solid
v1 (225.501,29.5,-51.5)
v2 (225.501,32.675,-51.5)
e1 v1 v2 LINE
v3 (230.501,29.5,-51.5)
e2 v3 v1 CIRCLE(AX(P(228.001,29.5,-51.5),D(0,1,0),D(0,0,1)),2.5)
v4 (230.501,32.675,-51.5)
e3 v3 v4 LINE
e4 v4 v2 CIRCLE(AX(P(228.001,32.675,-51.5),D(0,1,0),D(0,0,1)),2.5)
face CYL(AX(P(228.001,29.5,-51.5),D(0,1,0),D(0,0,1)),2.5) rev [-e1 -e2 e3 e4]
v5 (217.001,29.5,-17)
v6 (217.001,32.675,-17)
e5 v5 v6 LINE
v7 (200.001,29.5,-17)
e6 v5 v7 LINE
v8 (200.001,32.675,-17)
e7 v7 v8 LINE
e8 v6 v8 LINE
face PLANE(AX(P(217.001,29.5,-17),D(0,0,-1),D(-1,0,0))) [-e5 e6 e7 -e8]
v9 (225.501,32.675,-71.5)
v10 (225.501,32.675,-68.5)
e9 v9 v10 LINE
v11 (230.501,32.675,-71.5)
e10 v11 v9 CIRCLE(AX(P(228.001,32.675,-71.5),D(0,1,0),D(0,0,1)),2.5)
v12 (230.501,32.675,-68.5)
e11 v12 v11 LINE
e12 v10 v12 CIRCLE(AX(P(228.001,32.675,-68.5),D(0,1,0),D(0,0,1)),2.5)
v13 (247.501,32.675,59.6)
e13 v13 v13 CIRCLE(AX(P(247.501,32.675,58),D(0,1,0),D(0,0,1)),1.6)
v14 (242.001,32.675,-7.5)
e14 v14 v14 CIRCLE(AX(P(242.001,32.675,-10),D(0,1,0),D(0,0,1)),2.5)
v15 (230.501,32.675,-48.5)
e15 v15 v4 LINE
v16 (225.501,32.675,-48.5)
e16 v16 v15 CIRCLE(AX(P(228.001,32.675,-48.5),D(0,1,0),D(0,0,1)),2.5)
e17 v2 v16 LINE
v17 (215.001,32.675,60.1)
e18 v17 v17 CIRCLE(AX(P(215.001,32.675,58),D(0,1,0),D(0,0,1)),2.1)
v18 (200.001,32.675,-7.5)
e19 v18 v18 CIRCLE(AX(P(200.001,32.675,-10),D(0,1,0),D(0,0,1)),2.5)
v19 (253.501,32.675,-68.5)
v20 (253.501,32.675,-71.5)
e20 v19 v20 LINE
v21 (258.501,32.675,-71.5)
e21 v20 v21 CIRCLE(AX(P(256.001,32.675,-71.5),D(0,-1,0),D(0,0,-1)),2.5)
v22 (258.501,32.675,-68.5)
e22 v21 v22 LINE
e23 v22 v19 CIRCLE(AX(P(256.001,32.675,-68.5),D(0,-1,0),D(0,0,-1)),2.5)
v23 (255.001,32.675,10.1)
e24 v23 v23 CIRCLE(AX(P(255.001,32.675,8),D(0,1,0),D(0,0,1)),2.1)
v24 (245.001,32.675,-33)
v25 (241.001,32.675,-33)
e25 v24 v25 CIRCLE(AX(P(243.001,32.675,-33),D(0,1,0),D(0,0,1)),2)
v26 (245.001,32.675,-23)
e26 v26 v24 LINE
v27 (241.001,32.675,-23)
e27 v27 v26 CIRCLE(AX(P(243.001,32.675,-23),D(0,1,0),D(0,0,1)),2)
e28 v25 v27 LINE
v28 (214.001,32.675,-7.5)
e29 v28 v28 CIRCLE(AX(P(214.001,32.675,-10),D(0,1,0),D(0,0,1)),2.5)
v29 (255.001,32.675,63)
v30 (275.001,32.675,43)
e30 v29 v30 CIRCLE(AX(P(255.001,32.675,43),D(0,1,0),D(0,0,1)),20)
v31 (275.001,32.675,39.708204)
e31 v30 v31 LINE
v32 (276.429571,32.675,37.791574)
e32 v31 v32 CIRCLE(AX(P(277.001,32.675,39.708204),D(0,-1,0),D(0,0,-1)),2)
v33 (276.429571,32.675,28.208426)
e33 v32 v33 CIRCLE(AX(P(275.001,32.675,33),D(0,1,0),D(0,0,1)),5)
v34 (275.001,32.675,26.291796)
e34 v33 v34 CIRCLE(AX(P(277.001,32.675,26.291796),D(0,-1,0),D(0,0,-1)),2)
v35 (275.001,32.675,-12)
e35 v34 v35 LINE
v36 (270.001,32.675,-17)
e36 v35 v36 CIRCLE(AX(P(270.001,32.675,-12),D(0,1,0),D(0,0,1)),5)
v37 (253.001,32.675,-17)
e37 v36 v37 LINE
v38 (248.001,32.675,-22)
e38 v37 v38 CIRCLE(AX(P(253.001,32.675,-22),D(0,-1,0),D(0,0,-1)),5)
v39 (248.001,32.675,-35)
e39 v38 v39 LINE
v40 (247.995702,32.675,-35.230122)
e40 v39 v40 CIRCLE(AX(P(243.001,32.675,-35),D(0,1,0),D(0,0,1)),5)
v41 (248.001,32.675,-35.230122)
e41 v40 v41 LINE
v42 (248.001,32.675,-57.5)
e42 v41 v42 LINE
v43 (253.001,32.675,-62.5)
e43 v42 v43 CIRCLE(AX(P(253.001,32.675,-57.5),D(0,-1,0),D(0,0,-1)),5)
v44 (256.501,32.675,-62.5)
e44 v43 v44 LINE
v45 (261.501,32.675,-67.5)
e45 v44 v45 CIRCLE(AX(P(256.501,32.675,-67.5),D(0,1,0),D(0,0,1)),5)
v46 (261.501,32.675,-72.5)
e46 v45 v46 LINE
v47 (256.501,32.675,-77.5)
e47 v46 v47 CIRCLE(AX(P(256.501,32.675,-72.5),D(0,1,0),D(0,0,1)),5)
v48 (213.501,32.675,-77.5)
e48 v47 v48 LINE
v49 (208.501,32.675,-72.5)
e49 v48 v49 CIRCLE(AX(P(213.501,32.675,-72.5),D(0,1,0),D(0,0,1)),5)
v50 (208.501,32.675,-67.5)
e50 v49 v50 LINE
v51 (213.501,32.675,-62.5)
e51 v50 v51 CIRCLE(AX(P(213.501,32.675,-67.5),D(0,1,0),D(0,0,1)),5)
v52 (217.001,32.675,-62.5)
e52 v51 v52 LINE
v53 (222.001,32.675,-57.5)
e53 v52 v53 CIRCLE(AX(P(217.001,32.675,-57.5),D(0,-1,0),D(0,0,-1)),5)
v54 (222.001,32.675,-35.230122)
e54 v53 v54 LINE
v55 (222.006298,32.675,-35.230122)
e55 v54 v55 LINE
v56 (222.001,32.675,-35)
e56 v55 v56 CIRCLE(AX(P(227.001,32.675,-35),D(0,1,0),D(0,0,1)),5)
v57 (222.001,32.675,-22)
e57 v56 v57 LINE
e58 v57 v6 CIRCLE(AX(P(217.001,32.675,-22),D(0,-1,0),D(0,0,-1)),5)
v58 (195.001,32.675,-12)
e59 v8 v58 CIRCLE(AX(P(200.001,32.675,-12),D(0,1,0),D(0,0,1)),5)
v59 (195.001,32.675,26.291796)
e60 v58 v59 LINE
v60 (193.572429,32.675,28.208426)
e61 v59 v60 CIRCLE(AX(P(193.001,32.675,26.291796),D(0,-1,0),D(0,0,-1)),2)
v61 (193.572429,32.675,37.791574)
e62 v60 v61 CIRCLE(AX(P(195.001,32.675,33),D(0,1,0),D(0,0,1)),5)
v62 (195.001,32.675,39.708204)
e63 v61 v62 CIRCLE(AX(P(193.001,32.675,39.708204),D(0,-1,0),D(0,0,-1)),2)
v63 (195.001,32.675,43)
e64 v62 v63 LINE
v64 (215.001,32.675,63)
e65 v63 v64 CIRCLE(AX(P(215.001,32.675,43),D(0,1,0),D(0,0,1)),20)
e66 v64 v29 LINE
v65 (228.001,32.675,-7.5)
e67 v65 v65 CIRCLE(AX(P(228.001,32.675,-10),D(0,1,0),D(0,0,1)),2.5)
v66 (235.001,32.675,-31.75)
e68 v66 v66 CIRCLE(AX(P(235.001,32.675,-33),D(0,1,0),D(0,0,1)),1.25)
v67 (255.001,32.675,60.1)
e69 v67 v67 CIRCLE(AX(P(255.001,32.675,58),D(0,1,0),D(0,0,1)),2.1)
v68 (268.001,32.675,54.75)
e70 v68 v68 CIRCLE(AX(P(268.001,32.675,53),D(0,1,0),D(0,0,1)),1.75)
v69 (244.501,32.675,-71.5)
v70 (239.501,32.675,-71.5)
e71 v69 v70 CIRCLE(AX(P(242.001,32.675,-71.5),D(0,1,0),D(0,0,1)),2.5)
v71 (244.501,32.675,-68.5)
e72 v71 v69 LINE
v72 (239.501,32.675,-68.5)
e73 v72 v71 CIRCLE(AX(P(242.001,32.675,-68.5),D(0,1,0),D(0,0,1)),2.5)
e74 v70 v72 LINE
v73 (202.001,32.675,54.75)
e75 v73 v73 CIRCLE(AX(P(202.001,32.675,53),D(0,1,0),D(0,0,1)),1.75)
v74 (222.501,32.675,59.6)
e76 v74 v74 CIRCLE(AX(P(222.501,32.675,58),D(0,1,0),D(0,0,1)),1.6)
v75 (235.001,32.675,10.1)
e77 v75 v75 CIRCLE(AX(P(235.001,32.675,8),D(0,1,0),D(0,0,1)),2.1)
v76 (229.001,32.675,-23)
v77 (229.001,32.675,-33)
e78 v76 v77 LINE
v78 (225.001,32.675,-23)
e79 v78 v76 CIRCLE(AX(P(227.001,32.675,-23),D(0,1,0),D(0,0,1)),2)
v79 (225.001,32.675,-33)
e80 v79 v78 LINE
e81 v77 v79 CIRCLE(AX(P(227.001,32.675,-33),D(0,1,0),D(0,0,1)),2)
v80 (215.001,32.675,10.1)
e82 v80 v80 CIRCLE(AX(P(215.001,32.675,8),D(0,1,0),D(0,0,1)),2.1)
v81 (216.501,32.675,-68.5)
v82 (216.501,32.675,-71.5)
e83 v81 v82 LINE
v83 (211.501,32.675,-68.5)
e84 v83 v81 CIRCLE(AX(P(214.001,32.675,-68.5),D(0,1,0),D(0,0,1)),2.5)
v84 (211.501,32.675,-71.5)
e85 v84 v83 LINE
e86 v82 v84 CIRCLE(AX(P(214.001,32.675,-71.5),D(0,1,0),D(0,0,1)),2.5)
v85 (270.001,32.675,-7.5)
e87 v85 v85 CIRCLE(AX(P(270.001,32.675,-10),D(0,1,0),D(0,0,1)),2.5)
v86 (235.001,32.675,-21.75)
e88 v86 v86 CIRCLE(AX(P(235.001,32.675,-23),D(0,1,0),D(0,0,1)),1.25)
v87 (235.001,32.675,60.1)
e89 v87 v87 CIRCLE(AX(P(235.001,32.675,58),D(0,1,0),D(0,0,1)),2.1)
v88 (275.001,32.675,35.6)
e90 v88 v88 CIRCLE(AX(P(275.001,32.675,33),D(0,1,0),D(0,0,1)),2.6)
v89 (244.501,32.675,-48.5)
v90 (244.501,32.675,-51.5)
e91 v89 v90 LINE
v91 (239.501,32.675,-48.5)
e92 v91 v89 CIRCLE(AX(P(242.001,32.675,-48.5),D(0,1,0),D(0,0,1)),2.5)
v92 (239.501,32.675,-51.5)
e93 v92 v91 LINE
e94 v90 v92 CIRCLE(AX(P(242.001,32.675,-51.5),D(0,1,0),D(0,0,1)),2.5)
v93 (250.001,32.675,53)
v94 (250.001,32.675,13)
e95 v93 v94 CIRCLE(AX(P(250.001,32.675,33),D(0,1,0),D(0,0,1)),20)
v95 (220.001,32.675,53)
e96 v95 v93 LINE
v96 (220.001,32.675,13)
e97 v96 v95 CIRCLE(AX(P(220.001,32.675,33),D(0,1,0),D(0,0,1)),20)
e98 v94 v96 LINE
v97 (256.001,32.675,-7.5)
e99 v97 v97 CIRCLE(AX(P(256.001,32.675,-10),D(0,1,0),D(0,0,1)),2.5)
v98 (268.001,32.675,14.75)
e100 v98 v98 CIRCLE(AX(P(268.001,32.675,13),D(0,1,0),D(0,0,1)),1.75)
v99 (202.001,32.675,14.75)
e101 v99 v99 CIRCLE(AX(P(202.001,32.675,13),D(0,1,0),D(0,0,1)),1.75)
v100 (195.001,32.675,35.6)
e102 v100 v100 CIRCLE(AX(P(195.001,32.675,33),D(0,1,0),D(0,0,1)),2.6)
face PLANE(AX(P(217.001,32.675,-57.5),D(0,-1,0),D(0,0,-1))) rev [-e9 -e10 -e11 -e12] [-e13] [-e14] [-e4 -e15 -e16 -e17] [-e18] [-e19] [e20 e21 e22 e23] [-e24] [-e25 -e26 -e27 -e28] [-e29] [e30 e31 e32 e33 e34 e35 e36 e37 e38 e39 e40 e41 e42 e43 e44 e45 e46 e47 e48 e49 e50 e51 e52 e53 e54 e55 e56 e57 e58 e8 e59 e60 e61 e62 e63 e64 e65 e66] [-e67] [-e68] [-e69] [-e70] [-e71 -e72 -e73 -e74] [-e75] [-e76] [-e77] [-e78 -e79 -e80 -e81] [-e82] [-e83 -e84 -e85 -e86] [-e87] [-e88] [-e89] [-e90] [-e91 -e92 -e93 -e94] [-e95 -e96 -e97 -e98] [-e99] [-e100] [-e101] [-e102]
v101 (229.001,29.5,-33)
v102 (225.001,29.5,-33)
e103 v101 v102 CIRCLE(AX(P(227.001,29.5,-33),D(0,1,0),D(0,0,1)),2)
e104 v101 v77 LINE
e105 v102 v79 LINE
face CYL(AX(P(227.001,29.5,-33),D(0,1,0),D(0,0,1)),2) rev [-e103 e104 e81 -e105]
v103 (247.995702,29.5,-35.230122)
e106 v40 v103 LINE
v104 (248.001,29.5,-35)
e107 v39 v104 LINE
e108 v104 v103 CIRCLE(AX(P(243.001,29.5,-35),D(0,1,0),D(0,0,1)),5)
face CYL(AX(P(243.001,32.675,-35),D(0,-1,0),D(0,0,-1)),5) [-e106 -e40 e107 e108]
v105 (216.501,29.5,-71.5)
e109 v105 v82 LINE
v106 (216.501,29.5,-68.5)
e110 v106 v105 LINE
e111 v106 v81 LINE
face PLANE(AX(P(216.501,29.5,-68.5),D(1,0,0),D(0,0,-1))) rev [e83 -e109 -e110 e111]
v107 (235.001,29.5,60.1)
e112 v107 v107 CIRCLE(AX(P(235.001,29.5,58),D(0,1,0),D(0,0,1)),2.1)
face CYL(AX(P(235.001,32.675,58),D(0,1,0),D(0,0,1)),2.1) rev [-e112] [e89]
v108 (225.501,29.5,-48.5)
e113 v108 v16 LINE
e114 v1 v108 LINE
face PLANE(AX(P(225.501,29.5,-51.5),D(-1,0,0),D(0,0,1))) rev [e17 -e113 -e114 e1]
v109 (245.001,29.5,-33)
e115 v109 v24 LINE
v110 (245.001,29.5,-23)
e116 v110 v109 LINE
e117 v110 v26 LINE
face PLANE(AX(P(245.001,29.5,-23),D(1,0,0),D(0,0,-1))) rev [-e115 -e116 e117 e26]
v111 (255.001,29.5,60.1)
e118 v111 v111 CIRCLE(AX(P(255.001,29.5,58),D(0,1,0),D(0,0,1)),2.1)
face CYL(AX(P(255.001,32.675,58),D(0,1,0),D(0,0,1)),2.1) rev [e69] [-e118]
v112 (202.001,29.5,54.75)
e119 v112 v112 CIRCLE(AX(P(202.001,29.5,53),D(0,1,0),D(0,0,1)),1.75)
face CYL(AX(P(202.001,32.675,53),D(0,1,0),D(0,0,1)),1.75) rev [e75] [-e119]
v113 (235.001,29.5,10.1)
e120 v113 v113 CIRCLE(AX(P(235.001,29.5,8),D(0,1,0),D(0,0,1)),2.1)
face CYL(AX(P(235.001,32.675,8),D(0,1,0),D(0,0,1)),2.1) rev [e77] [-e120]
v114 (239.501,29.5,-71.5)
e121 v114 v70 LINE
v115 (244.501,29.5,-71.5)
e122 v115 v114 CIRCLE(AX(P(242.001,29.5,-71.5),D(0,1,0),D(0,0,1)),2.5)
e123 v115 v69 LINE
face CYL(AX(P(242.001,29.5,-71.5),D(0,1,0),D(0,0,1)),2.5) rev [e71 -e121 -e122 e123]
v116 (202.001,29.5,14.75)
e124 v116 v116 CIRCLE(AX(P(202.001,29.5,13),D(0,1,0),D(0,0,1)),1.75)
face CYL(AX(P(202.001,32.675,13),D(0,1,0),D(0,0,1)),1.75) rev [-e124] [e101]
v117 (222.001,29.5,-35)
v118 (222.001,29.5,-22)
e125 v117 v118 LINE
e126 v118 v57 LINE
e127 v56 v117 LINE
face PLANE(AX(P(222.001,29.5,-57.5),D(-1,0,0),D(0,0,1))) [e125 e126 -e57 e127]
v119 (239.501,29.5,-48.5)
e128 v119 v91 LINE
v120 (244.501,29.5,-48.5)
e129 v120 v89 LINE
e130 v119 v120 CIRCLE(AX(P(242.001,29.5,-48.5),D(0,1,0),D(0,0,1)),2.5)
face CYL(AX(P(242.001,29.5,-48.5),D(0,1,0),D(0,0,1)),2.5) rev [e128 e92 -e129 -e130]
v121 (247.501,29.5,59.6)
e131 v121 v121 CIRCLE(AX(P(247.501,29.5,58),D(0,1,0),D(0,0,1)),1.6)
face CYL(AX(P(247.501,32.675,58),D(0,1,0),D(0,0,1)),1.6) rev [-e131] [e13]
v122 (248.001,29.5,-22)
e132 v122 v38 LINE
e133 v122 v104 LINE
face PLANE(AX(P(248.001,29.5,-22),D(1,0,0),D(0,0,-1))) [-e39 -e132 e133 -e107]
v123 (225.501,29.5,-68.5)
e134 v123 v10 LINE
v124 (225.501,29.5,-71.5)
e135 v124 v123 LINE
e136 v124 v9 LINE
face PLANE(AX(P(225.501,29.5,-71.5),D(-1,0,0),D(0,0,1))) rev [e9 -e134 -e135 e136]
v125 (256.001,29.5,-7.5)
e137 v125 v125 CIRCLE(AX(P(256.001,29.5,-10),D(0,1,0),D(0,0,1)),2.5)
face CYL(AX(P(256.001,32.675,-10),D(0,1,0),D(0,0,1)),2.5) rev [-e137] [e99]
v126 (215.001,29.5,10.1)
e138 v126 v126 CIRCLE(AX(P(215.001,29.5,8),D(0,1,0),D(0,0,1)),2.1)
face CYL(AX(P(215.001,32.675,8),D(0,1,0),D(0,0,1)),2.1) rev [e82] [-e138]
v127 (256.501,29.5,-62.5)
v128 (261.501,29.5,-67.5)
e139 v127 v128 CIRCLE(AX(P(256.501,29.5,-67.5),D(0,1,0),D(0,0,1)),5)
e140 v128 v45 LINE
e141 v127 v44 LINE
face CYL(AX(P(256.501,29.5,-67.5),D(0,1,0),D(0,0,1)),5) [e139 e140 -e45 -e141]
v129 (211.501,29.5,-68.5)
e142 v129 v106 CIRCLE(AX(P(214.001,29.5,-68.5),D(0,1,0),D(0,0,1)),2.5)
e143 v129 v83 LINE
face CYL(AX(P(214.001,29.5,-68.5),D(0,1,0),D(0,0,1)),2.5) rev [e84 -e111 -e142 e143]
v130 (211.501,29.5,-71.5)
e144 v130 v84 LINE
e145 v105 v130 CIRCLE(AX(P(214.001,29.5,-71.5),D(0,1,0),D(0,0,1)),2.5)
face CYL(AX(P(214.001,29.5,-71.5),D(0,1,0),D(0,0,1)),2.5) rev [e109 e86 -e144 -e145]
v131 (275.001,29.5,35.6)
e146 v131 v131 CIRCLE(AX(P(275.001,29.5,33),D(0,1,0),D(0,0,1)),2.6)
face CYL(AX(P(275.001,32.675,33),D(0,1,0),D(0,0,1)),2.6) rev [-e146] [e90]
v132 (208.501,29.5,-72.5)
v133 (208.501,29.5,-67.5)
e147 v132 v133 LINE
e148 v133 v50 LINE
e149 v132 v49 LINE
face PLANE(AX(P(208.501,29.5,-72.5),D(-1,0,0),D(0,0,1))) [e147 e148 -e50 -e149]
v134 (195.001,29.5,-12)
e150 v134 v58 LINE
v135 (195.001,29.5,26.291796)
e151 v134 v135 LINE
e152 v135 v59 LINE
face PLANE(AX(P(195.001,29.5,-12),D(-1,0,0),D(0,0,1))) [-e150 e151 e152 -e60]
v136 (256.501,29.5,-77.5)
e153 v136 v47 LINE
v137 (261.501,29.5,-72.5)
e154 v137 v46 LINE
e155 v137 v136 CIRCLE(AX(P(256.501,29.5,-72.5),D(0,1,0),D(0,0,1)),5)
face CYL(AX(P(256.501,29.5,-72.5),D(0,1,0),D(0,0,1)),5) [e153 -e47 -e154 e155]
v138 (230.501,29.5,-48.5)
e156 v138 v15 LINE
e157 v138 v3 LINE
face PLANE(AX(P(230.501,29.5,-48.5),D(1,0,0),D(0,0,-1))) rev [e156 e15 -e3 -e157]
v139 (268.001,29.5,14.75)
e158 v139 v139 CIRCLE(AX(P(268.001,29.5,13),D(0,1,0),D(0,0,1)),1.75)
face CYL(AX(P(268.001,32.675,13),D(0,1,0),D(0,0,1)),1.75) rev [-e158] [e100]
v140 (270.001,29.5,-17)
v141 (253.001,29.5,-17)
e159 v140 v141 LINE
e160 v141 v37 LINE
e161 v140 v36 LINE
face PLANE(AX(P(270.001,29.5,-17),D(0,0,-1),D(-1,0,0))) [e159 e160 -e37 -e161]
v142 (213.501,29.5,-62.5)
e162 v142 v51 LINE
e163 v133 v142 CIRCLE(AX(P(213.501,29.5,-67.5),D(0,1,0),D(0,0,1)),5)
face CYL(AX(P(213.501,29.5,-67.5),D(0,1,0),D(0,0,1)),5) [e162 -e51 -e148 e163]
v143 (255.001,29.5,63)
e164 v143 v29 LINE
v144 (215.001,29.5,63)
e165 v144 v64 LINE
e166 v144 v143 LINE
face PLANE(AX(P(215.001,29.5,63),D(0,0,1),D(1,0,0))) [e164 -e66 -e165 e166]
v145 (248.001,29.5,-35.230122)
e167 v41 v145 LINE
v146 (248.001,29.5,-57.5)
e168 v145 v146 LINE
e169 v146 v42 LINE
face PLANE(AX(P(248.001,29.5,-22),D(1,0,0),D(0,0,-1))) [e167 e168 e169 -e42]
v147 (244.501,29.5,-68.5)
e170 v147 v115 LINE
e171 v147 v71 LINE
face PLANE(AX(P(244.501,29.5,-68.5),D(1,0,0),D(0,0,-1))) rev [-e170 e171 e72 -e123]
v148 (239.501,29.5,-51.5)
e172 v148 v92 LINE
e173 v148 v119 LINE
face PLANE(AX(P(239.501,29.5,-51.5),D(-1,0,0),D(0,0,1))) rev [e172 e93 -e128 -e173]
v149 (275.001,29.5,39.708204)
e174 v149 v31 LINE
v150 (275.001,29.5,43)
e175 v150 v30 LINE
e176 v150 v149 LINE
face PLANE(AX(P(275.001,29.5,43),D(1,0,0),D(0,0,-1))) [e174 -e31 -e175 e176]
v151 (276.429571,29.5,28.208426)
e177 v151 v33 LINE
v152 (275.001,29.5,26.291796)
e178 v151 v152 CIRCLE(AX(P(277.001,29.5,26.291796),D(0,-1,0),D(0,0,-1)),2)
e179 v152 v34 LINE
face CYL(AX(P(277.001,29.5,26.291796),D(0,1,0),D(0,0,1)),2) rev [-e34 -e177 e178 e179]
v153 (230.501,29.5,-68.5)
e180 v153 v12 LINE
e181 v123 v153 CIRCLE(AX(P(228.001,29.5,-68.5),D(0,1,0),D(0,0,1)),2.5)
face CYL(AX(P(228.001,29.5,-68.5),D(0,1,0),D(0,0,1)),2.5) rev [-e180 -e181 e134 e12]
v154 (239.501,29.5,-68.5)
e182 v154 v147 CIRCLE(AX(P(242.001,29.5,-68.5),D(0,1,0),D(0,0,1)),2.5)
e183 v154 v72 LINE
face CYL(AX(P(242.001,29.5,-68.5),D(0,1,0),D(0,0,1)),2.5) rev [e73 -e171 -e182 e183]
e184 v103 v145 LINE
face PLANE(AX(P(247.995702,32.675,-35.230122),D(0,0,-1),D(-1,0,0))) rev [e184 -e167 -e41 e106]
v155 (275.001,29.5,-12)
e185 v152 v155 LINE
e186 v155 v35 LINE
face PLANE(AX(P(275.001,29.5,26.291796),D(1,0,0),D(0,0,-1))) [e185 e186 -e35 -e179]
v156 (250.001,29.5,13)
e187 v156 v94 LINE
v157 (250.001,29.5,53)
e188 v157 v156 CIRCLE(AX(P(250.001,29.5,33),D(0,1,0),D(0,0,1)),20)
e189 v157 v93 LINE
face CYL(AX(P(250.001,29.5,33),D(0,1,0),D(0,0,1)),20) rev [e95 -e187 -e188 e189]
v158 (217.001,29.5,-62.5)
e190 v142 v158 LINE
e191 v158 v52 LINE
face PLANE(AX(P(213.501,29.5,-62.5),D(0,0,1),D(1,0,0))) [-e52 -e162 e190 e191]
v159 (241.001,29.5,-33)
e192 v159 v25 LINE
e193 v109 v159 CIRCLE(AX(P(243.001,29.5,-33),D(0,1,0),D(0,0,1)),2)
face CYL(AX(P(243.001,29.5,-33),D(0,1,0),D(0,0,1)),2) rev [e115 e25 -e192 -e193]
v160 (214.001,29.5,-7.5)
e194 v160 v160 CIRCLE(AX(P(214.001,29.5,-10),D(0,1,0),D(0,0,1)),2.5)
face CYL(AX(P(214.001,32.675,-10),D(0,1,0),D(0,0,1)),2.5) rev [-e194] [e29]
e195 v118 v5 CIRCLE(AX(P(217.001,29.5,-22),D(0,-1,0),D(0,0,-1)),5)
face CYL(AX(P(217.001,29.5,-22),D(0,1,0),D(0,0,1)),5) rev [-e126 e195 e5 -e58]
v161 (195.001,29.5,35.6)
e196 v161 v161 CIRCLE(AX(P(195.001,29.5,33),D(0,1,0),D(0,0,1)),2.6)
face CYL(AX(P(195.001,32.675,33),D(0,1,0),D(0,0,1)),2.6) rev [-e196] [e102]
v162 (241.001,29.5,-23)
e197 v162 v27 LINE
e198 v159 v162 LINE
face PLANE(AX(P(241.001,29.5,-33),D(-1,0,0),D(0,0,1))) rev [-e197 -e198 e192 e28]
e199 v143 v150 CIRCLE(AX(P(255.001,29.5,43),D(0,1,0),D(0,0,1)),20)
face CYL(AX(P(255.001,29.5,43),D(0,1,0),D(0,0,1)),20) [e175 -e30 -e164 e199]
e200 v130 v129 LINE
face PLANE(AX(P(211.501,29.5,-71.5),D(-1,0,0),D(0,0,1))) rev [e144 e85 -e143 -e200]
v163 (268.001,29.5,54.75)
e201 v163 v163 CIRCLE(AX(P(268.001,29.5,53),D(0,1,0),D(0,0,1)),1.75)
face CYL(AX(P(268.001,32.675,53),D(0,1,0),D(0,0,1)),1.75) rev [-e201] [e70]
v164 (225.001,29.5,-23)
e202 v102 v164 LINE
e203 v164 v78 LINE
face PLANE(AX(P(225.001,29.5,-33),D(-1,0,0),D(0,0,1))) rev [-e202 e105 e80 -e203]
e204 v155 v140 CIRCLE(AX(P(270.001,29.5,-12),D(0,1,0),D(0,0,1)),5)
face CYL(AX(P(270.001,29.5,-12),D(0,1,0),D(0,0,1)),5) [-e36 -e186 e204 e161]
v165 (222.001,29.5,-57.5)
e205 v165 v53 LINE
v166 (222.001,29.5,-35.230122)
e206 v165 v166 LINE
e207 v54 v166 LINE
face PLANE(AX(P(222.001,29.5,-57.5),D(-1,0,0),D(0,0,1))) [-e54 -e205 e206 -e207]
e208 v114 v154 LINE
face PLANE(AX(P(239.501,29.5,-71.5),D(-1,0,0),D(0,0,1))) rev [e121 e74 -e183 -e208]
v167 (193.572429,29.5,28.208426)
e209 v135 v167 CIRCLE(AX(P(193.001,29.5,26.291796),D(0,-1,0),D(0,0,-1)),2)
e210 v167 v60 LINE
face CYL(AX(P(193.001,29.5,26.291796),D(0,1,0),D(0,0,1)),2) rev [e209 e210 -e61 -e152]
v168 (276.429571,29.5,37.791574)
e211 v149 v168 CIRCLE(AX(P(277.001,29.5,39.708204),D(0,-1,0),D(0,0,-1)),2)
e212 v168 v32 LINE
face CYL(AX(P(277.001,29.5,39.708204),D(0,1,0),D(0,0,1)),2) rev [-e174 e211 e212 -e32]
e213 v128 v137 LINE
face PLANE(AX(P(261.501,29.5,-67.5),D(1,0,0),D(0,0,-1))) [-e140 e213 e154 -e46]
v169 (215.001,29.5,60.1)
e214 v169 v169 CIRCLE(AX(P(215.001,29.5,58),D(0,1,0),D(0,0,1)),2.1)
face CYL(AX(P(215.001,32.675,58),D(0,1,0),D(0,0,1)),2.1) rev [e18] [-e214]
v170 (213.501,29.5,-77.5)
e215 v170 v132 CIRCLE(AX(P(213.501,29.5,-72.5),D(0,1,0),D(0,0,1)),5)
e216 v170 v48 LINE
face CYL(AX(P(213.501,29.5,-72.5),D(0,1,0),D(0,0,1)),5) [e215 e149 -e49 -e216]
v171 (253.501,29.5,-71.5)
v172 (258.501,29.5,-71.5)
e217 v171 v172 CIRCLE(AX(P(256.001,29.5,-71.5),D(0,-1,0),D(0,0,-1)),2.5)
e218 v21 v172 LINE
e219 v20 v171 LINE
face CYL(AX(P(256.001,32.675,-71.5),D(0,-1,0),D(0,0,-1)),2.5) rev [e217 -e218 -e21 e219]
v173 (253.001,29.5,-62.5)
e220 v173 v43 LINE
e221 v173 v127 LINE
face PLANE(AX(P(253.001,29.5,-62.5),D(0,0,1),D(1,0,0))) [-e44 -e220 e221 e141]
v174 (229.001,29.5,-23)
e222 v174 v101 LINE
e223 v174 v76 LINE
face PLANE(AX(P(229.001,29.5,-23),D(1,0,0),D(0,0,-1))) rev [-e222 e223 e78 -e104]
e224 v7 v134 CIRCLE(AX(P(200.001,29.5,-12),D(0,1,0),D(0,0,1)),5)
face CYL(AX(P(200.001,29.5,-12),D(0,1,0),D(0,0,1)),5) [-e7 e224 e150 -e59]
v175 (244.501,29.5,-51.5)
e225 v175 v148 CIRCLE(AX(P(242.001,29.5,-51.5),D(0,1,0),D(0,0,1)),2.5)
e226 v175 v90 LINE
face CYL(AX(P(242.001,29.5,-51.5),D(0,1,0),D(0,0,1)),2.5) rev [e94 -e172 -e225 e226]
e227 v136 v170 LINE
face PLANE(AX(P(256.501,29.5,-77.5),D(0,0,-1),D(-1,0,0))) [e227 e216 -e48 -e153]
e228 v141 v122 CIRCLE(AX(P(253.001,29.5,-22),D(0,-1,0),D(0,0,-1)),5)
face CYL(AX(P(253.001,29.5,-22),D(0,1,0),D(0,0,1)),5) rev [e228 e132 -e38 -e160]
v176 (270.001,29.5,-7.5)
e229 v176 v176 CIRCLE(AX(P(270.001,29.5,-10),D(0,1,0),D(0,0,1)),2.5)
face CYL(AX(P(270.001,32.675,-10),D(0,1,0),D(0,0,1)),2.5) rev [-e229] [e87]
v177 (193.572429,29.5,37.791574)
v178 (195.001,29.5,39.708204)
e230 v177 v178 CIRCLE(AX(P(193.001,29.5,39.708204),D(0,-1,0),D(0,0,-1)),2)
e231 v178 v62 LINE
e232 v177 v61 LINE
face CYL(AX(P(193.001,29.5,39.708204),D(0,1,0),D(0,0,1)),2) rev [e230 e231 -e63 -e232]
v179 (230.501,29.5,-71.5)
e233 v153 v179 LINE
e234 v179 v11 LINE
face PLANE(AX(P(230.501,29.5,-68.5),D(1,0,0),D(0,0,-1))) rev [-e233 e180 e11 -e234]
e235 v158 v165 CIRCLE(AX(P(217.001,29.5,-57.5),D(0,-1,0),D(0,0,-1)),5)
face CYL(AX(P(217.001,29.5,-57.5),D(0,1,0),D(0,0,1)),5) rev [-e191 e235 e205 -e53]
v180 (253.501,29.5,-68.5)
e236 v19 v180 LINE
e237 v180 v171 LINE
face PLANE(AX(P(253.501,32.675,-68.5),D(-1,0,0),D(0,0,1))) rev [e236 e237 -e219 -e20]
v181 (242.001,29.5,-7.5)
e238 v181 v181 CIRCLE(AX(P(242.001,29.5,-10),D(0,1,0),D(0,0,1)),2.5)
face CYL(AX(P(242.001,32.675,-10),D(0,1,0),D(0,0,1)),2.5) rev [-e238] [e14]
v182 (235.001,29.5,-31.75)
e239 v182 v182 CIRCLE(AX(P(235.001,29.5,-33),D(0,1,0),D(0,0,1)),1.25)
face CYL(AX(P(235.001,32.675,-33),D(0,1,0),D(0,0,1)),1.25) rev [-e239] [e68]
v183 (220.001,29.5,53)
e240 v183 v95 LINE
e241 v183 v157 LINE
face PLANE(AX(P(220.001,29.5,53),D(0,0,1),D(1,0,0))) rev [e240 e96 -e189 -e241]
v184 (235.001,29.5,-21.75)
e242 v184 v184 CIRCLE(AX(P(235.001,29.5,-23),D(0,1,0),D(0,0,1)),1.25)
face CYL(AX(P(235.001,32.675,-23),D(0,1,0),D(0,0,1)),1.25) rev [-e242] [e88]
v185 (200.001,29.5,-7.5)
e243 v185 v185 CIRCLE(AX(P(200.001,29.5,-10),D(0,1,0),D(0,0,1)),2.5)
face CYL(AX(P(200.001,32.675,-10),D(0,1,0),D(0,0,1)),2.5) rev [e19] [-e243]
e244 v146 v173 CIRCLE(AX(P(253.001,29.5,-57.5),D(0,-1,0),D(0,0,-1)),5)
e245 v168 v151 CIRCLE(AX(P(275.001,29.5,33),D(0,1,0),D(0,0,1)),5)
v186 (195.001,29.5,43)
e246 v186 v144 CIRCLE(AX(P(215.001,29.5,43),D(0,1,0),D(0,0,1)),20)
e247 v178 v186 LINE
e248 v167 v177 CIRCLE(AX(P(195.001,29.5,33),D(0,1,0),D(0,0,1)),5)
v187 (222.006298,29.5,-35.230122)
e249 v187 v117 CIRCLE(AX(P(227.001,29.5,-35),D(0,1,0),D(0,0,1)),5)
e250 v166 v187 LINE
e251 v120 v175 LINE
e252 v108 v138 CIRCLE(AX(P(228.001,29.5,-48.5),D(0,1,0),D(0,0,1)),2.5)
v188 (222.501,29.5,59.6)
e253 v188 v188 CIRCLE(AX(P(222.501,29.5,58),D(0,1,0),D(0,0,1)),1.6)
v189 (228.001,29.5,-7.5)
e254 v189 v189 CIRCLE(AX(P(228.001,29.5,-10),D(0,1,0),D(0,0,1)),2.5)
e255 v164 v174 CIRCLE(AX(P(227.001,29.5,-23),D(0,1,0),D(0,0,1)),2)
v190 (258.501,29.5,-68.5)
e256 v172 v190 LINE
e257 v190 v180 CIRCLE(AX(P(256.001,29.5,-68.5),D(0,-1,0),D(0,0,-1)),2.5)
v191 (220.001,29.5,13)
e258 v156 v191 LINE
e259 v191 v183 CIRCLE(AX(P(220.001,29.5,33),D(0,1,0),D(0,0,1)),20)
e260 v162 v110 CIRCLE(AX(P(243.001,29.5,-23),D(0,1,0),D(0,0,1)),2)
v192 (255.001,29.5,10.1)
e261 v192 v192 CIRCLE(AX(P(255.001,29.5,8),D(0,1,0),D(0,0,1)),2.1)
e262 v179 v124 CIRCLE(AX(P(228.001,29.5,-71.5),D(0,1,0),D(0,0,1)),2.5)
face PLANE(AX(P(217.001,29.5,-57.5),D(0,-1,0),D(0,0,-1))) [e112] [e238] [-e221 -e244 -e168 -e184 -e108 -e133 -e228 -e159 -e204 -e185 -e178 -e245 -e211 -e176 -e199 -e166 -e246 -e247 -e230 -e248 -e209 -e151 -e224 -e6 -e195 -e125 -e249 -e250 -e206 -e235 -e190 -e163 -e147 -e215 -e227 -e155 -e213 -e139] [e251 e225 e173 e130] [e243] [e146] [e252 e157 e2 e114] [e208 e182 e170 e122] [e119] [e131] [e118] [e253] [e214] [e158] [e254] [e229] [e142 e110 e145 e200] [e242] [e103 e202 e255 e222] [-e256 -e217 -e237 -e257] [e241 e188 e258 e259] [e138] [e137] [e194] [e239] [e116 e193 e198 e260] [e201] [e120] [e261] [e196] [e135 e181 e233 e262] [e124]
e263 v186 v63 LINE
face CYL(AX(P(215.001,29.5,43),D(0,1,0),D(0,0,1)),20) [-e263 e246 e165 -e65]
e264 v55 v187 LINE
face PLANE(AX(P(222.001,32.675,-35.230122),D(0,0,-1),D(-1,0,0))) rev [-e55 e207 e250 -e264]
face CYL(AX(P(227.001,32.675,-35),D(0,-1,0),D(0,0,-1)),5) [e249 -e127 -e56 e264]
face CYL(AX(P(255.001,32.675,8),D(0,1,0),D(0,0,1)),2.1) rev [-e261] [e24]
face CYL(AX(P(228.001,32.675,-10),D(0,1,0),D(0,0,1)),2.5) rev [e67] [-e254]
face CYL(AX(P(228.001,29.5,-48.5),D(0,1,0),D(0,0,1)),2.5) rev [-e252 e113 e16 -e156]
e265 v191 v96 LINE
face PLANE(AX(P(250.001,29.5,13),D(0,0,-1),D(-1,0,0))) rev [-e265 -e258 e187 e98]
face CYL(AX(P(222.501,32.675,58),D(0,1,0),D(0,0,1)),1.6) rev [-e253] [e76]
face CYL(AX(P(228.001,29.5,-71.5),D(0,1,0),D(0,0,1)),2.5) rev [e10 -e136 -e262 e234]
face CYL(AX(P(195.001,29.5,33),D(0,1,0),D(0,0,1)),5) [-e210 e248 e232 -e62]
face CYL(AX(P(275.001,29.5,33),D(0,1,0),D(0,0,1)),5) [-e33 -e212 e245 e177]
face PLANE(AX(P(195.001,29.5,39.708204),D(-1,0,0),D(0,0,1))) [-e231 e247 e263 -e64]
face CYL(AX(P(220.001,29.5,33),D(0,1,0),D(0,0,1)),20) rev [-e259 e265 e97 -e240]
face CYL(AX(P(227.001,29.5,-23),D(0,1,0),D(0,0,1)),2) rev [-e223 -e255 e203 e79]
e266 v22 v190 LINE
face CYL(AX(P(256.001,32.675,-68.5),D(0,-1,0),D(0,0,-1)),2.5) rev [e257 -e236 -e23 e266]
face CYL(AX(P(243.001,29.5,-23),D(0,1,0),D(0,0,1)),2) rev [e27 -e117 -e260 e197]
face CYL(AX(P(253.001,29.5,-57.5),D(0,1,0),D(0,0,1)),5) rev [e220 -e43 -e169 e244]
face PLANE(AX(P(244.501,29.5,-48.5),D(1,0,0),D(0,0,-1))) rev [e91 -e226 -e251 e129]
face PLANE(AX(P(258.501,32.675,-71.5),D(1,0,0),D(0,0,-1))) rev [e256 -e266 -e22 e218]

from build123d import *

# Parameters (mm, degrees)
BASE_FLANGE1_DEPTH         = 3.175
CUT_EXTRUDE1_DEPTH         = 3.175
CUT_EXTRUDE2_DEPTH         = 3.175
CUT_EXTRUDE3_DEPTH         = 291.545849439
CUT_EXTRUDE4_DEPTH         = 291.545849439
CUT_EXTRUDE5_DEPTH         = 291.545849439
CUT_EXTRUDE6_DEPTH         = 291.545849439
CUT_EXTRUDE7_DEPTH         = 291.545849439
CUT_EXTRUDE8_DEPTH         = 291.545849439
CUT_EXTRUDE9_DEPTH         = 291.545849439
CUT_EXTRUDE10_DEPTH        = 291.545849439
CUT_EXTRUDE11_DEPTH        = 291.545849439
F_4_2_4_2_DIAMETER_HOLE1_D = 4.2
F_5_2_5_2_DIAMETER_HOLE1_D = 5.2
F_3_5_3_5_DIAMETER_HOLE1_D = 3.5
F_3_2_3_2_DIAMETER_HOLE1_D = 3.2
F_5_0_5_DIAMETER_HOLE1_D   = 5
F_2_5_2_5_DIAMETER_HOLE1_D = 2.5


# Sheet-metal steps are written as plain solids
with BuildPart() as part:
    # Sketch11 → Base-Flange1 (new body)
    with BuildSketch(Plane(origin=(0, 32.675, 0), x_dir=(1, 0, 0), z_dir=(0, 1, 0))):
        with BuildLine():
            Line((222.001, 57.5), (222.001, 22))
            ThreePointArc((222.001, 22), (220.536533906, 18.464466094), (217.001, 17))
            Line((217.001, 17), (200.001, 17))
            ThreePointArc((200.001, 17), (196.465466094, 15.535533906), (195.001, 12))
            Line((195.001, 12), (195.001, -26.291796068))
            ThreePointArc((195.001, -26.291796068), (194.604567451, -27.487024677), (193.572428571, -28.208425763))
            ThreePointArc((193.572428571, -28.208425763), (190.001, -33), (193.572428571, -37.791574237))
            ThreePointArc((193.572428571, -37.791574237), (194.604567451, -38.512975323), (195.001, -39.708203932))
            Line((195.001, -39.708203932), (195.001, -43))
            ThreePointArc((195.001, -43), (200.858864376, -57.142135624), (215.001, -63))
            Line((215.001, -63), (255.001, -63))
            ThreePointArc((255.001, -63), (269.143135624, -57.142135624), (275.001, -43))
            Line((275.001, -43), (275.001, -39.708203932))
            ThreePointArc((275.001, -39.708203932), (275.397432549, -38.512975323), (276.429571429, -37.791574237))
            ThreePointArc((276.429571429, -37.791574237), (280.001, -33), (276.429571429, -28.208425763))
            ThreePointArc((276.429571429, -28.208425763), (275.397432549, -27.487024677), (275.001, -26.291796068))
            Line((275.001, -26.291796068), (275.001, 12))
            ThreePointArc((275.001, 12), (273.536533906, 15.535533906), (270.001, 17))
            Line((270.001, 17), (253.001, 17))
            ThreePointArc((253.001, 17), (249.465466094, 18.464466094), (248.001, 22))
            Line((248.001, 22), (248.001, 57.5))
            ThreePointArc((248.001, 57.5), (249.465466094, 61.035533906), (253.001, 62.5))
            Line((253.001, 62.5), (256.501, 62.5))
            ThreePointArc((256.501, 62.5), (260.036533906, 63.964466094), (261.501, 67.5))
            Line((261.501, 67.5), (261.501, 72.5))
            ThreePointArc((261.501, 72.5), (260.036533906, 76.035533906), (256.501, 77.5))
            Line((256.501, 77.5), (213.501, 77.5))
            ThreePointArc((213.501, 77.5), (209.965466094, 76.035533906), (208.501, 72.5))
            Line((208.501, 72.5), (208.501, 67.5))
            ThreePointArc((208.501, 67.5), (209.965466094, 63.964466094), (213.501, 62.5))
            Line((213.501, 62.5), (217.001, 62.5))
            ThreePointArc((217.001, 62.5), (220.536533906, 61.035533906), (222.001, 57.5))
        make_face()
    extrude(amount=-BASE_FLANGE1_DEPTH)

    # Sketch16 → Cut-Extrude1 (cut)
    with BuildSketch(Plane.XZ.offset(-29.5)):
        with BuildLine():
            Line((222.001, -35), (222.001, -35.230121613))
            Line((222.001, -35.230121613), (222.006298403, -35.230121613))
            ThreePointArc((222.006298403, -35.230121613), (222.002324776, -35.1150913), (222.001, -35))
        make_face()
    extrude(amount=-CUT_EXTRUDE1_DEPTH, mode=Mode.SUBTRACT)

    # Sketch17 → Cut-Extrude2 (cut)
    with BuildSketch(Plane.XZ.offset(-29.5)):
        with BuildLine():
            Line((248.001, -35.230121613), (248.001, -35))
            ThreePointArc((248.001, -35), (247.999675224, -35.1150913), (247.995701597, -35.230121613))
            Line((247.995701597, -35.230121613), (248.001, -35.230121613))
        make_face()
    extrude(amount=-CUT_EXTRUDE2_DEPTH, mode=Mode.SUBTRACT)

    # Sketch18 → Cut-Extrude3 (cut, through all)
    with BuildSketch(Plane(origin=(0, 32.675, 0), x_dir=(-1, 0, 0), z_dir=(0, 1, 0))):
        with BuildLine():
            Line((-250.001, 13), (-220.001, 13))
            ThreePointArc((-220.001, 13), (-200.001, 33), (-220.001, 53))
            Line((-220.001, 53), (-250.001, 53))
            ThreePointArc((-250.001, 53), (-270.001, 33), (-250.001, 13))
        make_face()
    extrude(amount=-CUT_EXTRUDE3_DEPTH, mode=Mode.SUBTRACT)

    # Sketch19 → Cut-Extrude4 (cut, through all)
    with BuildSketch(Plane(origin=(0, 32.675, 0), x_dir=(-1, 0, 0), z_dir=(0, 1, 0))):
        with BuildLine():
            Line((-225.001, -33), (-225.001, -23))
            ThreePointArc((-225.001, -23), (-227.001, -21), (-229.001, -23))
            Line((-229.001, -23), (-229.001, -33))
            ThreePointArc((-229.001, -33), (-227.001, -35), (-225.001, -33))
        make_face()
    extrude(amount=-CUT_EXTRUDE4_DEPTH, mode=Mode.SUBTRACT)

    # Sketch20 → Cut-Extrude5 (cut, through all)
    with BuildSketch(Plane(origin=(0, 32.675, 0), x_dir=(-1, 0, 0), z_dir=(0, 1, 0))):
        with BuildLine():
            Line((-241.001, -33), (-241.001, -23))
            ThreePointArc((-241.001, -23), (-243.001, -21), (-245.001, -23))
            Line((-245.001, -23), (-245.001, -33))
            ThreePointArc((-245.001, -33), (-243.001, -35), (-241.001, -33))
        make_face()
    extrude(amount=-CUT_EXTRUDE5_DEPTH, mode=Mode.SUBTRACT)

    # Sketch21 → Cut-Extrude6 (cut, through all)
    with BuildSketch(Plane(origin=(0, 32.675, 0), x_dir=(-1, 0, 0), z_dir=(0, 1, 0))):
        with BuildLine():
            Line((-225.501, -51.5), (-225.501, -48.5))
            ThreePointArc((-225.501, -48.5), (-228.001, -46), (-230.501, -48.5))
            Line((-230.501, -48.5), (-230.501, -51.5))
            ThreePointArc((-230.501, -51.5), (-228.001, -54), (-225.501, -51.5))
        make_face()
    extrude(amount=-CUT_EXTRUDE6_DEPTH, mode=Mode.SUBTRACT)

    # Sketch22 → Cut-Extrude7 (cut, through all)
    with BuildSketch(Plane(origin=(0, 32.675, 0), x_dir=(-1, 0, 0), z_dir=(0, 1, 0))):
        with BuildLine():
            Line((-239.501, -51.5), (-239.501, -48.5))
            ThreePointArc((-239.501, -48.5), (-242.001, -46), (-244.501, -48.5))
            Line((-244.501, -48.5), (-244.501, -51.5))
            ThreePointArc((-244.501, -51.5), (-242.001, -54), (-239.501, -51.5))
        make_face()
    extrude(amount=-CUT_EXTRUDE7_DEPTH, mode=Mode.SUBTRACT)

    # Sketch23 → Cut-Extrude8 (cut, through all)
    with BuildSketch(Plane(origin=(0, 32.675, 0), x_dir=(-1, 0, 0), z_dir=(0, 1, 0))):
        with BuildLine():
            Line((-211.501, -71.5), (-211.501, -68.5))
            ThreePointArc((-211.501, -68.5), (-214.001, -66), (-216.501, -68.5))
            Line((-216.501, -68.5), (-216.501, -71.5))
            ThreePointArc((-216.501, -71.5), (-214.001, -74), (-211.501, -71.5))
        make_face()
    extrude(amount=-CUT_EXTRUDE8_DEPTH, mode=Mode.SUBTRACT)

    # Sketch24 → Cut-Extrude9 (cut, through all)
    with BuildSketch(Plane(origin=(0, 32.675, 0), x_dir=(-1, 0, 0), z_dir=(0, 1, 0))):
        with BuildLine():
            Line((-225.501, -71.5), (-225.501, -68.5))
            ThreePointArc((-225.501, -68.5), (-228.001, -66), (-230.501, -68.5))
            Line((-230.501, -68.5), (-230.501, -71.5))
            ThreePointArc((-230.501, -71.5), (-228.001, -74), (-225.501, -71.5))
        make_face()
    extrude(amount=-CUT_EXTRUDE9_DEPTH, mode=Mode.SUBTRACT)

    # Sketch25 → Cut-Extrude10 (cut, through all)
    with BuildSketch(Plane(origin=(0, 32.675, 0), x_dir=(-1, 0, 0), z_dir=(0, 1, 0))):
        with BuildLine():
            Line((-239.501, -71.5), (-239.501, -68.5))
            ThreePointArc((-239.501, -68.5), (-242.001, -66), (-244.501, -68.5))
            Line((-244.501, -68.5), (-244.501, -71.5))
            ThreePointArc((-244.501, -71.5), (-242.001, -74), (-239.501, -71.5))
        make_face()
    extrude(amount=-CUT_EXTRUDE10_DEPTH, mode=Mode.SUBTRACT)

    # Sketch26 → Cut-Extrude11 (cut, through all)
    with BuildSketch(Plane.XZ.offset(-29.5)):
        with BuildLine():
            Line((253.501, -68.5), (253.501, -71.5))
            ThreePointArc((253.501, -71.5), (256.001, -74), (258.501, -71.5))
            Line((258.501, -71.5), (258.501, -68.5))
            ThreePointArc((258.501, -68.5), (256.001, -66), (253.501, -68.5))
        make_face()
    extrude(amount=-CUT_EXTRUDE11_DEPTH, mode=Mode.SUBTRACT)

    # Ø4.2 (4.2) Diameter Hole1 (through all)
    with Locations(Plane(origin=(0, 32.675, 0), x_dir=(1, 0, 0), z_dir=(0, 1, 0))):
        with Locations((215.001, -8), (215.001, -58), (255.001, -8), (235.001, -58), (255.001, -58), (235.001, -8)):
            Hole(F_4_2_4_2_DIAMETER_HOLE1_D / 2)

    # Ø5.2 (5.2) Diameter Hole1 (through all)
    with Locations(Plane(origin=(0, 32.675, 0), x_dir=(1, 0, 0), z_dir=(0, 1, 0))):
        with Locations((275.001, -33), (195.001, -33)):
            Hole(F_5_2_5_2_DIAMETER_HOLE1_D / 2)

    # Ø3.5 (3.5) Diameter Hole1 (through all)
    with Locations(Plane(origin=(0, 32.675, 0), x_dir=(1, 0, 0), z_dir=(0, 1, 0))):
        with Locations((202.001, -53), (268.001, -13), (202.001, -13), (268.001, -53)):
            Hole(F_3_5_3_5_DIAMETER_HOLE1_D / 2)

    # Ø3.2 (3.2) Diameter Hole1 (through all)
    with Locations(Plane(origin=(0, 32.675, 0), x_dir=(1, 0, 0), z_dir=(0, 1, 0))):
        with Locations((247.501, -58), (222.501, -58)):
            Hole(F_3_2_3_2_DIAMETER_HOLE1_D / 2)

    # Ø5.0 (5) Diameter Hole1 (through all)
    with Locations(Plane(origin=(0, 32.675, 0), x_dir=(1, 0, 0), z_dir=(0, 1, 0))):
        with Locations((242.001, 10), (228.001, 10), (270.001, 10), (256.001, 10), (214.001, 10), (200.001, 10)):
            Hole(F_5_0_5_DIAMETER_HOLE1_D / 2)

    # Ø2.5 (2.5) Diameter Hole1 (through all)
    with Locations(Plane(origin=(0, 32.675, 0), x_dir=(1, 0, 0), z_dir=(0, 1, 0))):
        with Locations((235.001, 23), (235.001, 33)):
            Hole(F_2_5_2_5_DIAMETER_HOLE1_D / 2)


solid = part.part
